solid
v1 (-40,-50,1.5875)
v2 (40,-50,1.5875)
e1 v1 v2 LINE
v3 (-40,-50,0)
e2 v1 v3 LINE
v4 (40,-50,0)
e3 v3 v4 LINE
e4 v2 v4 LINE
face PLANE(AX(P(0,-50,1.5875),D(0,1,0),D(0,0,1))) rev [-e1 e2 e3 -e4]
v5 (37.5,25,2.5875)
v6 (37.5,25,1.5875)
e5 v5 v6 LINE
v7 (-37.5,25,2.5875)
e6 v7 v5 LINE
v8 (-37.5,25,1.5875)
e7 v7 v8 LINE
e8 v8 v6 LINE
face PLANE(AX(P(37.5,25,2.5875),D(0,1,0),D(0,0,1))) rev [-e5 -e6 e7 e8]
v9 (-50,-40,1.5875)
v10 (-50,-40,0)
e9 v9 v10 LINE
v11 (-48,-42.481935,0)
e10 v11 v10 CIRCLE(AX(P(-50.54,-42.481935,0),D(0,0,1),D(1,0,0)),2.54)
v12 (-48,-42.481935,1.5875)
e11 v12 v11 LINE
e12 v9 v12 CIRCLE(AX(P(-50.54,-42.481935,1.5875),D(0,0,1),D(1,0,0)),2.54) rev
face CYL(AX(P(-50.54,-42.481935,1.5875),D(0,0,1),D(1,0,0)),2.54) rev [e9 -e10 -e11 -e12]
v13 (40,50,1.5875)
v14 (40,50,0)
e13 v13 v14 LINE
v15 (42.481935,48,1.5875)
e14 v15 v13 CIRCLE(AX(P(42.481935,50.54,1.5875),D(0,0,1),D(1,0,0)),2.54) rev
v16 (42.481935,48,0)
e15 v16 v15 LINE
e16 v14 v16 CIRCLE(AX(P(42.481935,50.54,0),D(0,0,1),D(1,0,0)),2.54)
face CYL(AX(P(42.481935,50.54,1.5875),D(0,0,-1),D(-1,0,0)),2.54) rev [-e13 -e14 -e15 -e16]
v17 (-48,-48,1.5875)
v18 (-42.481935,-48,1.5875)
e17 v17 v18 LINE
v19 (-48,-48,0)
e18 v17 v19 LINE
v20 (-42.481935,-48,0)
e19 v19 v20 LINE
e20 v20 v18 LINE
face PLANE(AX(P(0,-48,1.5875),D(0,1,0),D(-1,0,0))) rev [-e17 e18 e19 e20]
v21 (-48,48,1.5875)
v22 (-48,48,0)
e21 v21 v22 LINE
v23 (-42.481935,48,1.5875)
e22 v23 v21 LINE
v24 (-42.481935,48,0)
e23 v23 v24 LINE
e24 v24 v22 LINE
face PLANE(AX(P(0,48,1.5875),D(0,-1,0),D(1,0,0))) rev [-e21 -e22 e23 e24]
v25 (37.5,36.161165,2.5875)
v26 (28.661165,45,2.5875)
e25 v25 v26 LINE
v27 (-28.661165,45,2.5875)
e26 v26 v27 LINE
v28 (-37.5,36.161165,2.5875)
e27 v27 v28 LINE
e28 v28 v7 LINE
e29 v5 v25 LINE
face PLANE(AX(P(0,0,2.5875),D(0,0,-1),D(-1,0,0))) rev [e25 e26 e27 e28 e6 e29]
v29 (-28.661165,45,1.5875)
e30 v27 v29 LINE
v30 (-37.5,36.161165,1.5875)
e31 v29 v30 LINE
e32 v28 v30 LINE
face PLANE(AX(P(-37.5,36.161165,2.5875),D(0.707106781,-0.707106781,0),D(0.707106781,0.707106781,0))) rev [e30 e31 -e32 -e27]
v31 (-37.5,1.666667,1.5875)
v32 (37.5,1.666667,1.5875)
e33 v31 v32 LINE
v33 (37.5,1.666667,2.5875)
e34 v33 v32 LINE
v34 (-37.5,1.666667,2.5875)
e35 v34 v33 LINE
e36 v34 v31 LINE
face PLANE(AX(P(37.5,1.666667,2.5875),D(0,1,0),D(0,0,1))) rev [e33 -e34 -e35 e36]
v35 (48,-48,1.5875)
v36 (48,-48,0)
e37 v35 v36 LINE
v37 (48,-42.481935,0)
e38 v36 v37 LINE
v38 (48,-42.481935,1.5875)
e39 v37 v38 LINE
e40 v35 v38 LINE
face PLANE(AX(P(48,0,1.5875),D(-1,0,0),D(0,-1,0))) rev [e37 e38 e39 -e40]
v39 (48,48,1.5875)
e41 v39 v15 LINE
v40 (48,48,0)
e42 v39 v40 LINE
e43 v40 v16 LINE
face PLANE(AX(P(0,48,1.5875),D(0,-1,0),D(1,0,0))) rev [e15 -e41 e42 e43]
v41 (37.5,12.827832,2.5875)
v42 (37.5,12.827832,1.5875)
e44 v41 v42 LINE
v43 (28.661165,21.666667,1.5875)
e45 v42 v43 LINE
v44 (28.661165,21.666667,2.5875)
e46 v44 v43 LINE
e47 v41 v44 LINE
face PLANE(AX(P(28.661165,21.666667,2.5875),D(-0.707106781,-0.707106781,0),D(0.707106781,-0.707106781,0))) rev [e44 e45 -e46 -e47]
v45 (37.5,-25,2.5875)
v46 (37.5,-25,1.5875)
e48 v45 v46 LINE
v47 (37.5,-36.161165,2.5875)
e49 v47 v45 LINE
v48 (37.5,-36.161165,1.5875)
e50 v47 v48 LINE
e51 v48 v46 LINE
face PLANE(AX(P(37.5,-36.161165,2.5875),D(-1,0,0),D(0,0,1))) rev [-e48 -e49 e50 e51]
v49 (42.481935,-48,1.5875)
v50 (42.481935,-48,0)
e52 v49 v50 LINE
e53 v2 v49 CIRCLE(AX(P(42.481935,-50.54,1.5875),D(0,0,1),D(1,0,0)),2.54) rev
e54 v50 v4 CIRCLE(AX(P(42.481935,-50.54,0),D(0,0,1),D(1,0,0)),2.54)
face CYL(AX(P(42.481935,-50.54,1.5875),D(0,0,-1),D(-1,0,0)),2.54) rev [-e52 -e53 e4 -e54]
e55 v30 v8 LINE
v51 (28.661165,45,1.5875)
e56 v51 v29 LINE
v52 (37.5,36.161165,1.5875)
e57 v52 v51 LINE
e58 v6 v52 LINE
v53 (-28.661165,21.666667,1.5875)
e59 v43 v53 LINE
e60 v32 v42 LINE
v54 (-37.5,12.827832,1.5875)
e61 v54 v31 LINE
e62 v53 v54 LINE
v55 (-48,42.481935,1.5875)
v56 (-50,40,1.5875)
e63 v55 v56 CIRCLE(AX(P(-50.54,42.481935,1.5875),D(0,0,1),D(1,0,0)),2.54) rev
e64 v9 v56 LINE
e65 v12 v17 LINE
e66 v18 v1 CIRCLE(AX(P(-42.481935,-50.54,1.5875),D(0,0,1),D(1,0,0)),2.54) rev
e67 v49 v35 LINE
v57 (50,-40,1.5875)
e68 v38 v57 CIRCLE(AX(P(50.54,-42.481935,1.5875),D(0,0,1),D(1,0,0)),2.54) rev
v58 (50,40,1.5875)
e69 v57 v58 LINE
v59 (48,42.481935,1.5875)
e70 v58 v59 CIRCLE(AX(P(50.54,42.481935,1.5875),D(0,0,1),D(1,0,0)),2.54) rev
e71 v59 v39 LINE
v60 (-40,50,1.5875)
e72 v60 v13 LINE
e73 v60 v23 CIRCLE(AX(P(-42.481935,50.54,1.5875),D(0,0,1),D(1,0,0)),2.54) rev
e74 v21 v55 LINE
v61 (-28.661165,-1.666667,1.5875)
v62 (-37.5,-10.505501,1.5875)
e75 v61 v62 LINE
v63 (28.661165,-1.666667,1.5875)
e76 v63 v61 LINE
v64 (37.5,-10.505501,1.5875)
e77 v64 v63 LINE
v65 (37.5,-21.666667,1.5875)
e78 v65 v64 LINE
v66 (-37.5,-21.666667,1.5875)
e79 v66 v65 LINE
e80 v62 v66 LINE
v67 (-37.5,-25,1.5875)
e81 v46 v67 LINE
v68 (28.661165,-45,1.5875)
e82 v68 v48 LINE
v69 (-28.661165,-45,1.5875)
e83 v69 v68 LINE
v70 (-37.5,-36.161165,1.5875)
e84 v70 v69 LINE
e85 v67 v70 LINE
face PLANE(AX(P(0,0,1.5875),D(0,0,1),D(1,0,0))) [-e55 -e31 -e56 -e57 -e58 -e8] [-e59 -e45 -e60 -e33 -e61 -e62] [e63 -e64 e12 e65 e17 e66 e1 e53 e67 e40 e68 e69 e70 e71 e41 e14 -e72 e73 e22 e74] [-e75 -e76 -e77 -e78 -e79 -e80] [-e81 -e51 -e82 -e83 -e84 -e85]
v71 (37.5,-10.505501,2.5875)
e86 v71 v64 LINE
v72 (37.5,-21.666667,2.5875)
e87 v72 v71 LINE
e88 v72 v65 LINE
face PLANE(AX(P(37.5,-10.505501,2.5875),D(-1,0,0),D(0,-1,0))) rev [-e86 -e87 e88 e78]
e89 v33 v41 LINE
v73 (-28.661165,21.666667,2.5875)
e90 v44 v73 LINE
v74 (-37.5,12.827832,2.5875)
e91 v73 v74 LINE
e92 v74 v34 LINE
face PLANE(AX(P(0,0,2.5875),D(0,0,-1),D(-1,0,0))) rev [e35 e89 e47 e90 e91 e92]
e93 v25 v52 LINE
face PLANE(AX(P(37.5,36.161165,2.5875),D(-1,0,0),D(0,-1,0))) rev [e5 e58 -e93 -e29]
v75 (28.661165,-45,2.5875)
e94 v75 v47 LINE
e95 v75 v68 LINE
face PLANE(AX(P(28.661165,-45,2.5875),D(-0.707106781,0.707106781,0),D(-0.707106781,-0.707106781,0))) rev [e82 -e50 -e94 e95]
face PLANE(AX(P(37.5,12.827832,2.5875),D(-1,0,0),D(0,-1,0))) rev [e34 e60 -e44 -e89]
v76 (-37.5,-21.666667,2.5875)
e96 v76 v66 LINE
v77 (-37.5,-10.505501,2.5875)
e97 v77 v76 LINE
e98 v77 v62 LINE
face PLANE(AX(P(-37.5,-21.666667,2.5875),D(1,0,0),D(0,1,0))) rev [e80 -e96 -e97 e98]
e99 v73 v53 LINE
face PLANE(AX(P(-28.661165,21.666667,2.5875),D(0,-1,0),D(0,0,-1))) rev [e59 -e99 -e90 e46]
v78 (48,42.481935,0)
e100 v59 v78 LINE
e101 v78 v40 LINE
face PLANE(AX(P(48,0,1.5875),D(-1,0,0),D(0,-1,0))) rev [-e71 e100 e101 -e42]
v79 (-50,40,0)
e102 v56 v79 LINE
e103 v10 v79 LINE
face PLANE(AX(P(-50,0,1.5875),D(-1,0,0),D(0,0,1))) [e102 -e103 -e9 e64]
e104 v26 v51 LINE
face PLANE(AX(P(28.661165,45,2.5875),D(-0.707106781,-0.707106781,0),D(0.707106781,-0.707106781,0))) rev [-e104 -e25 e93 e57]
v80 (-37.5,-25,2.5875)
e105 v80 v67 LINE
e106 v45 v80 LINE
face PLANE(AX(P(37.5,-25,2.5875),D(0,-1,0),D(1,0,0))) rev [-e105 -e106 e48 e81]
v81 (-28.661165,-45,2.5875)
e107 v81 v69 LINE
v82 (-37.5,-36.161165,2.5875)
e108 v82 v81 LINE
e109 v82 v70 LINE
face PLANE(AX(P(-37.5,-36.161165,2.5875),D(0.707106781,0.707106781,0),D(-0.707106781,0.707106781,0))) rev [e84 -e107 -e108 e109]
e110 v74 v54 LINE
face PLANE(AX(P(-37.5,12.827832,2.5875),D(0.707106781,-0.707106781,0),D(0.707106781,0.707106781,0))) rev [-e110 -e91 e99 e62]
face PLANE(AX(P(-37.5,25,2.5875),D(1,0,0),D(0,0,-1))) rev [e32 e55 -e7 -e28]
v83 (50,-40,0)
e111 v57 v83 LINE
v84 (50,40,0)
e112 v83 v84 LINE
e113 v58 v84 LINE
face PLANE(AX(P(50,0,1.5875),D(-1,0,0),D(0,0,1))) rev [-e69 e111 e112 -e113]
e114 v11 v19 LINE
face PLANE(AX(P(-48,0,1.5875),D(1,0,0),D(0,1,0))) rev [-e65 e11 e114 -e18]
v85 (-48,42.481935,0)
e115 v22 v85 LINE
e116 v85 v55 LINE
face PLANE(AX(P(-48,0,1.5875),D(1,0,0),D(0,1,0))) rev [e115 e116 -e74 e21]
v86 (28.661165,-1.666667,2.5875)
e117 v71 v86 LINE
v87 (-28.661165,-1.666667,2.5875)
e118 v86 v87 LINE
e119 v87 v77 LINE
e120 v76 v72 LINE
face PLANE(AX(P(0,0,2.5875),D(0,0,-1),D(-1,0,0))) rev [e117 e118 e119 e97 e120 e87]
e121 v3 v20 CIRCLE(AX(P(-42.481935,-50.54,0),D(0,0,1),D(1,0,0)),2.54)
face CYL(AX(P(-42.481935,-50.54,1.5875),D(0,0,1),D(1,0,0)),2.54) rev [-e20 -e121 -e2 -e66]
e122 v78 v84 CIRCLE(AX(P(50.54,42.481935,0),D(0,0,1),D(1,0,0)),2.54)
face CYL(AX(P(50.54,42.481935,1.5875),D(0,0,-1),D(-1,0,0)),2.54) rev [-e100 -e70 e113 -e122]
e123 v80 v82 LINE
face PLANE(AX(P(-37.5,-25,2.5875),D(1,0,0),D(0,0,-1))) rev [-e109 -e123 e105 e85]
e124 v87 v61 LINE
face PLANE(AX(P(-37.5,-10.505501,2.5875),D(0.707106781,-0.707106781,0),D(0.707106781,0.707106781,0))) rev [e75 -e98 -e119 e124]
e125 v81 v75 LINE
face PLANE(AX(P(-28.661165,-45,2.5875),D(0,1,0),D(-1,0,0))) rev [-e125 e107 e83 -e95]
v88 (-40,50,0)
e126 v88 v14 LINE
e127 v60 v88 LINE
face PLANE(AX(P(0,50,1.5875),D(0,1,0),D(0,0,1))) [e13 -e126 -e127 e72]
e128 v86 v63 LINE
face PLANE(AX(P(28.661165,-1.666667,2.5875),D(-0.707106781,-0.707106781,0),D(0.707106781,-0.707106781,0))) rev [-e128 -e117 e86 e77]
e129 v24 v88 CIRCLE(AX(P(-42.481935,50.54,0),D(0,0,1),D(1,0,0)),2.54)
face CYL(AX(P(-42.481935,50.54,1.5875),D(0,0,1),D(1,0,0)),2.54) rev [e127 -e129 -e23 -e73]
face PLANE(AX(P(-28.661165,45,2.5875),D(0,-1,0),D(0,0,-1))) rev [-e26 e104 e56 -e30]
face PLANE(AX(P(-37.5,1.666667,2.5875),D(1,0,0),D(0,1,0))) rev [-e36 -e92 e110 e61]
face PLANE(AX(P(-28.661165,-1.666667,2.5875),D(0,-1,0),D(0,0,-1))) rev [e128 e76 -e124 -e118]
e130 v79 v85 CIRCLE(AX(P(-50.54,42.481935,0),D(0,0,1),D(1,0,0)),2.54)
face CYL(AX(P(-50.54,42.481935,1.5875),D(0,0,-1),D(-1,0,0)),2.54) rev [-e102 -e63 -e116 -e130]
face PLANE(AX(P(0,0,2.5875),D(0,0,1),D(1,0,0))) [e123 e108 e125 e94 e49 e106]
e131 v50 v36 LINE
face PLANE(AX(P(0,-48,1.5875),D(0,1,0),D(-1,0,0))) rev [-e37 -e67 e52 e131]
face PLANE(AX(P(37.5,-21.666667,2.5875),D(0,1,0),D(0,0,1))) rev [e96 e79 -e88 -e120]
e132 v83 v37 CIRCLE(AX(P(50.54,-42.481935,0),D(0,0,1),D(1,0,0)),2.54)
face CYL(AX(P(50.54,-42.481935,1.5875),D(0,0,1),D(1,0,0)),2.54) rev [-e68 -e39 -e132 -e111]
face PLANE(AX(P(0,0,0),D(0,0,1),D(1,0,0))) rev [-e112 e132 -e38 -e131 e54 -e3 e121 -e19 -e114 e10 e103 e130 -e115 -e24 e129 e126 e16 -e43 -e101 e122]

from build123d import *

# Parameters (mm, degrees)
BOSS_EXTRUDE1_DEPTH = 1.5875
BOSS_EXTRUDE2_DEPTH = 1
FILLET1_R           = 2.54


with BuildPart() as part:
    # Sketch1 → Boss-Extrude1 (new body)
    with BuildSketch(Plane.XY):
        Polygon((40, 50), (-40, 50), (-40, 48), (-48, 48), (-48, 40), (-50, 40), (-50, -37.864895224), (-50, -40), (-48, -40), (-48, -48), (-40, -48), (-40, -50), (-37.864895224, -50), (40, -50), (40, -48), (48, -48), (48, -40), (50, -40), (50, 40), (48, 40), (48, 48), (40, 48), align=None)
    extrude(amount=BOSS_EXTRUDE1_DEPTH)

    # Sketch2 → Boss-Extrude2 (add)
    with BuildSketch(Plane.XY.offset(1.5875)):
        Polygon((-28.661165235, 45), (28.661165235, 45), (37.5, 36.161165235), (37.5, 25), (-37.5, 25), (-37.5, 36.161165235), align=None)
        Polygon((-28.661165235, 21.666666667), (28.661165235, 21.666666667), (37.5, 12.827831902), (37.5, 1.666666667), (-37.5, 1.666666667), (-37.5, 12.827831902), align=None)
        Polygon((-28.661165235, -1.666666667), (28.661165235, -1.666666667), (37.5, -10.505501431), (37.5, -21.666666667), (-37.5, -21.666666667), (-37.5, -10.505501431), align=None)
        Polygon((-37.5, -36.161165235), (-28.661165235, -45), (28.661165235, -45), (37.5, -36.161165235), (37.5, -25), (-37.5, -25), align=None)
    extrude(amount=BOSS_EXTRUDE2_DEPTH)

    # Fillet1
    # the kernel refuses this fillet: 2.54 mm, written as the material it adds along each edge
    with BuildSketch(Plane(origin=(-48, -40, 0), x_dir=(-1.0, -3.6735059438767946e-12, 0), z_dir=(0, 0, 1)), Plane(origin=(40, -48, 0), x_dir=(3.808509063671012e-12, -1.0, 0), z_dir=(0, 0, 1)), Plane(origin=(48, 40, 0), x_dir=(1.0, 3.659295089161617e-12, 0), z_dir=(0, 0, 1)), Plane(origin=(-40, 48, 0), x_dir=(-3.7978509226345916e-12, 1.0, 0), z_dir=(0, 0, 1))) as fillet1_piece_1:
        with BuildLine():
            CenterArc((2.54, 2.481934729), FILLET1_R, 180, 77.725329785)
            Line((0, 2.481934729), (-0.0508, 2.481934729))
            Line((-0.0508, 2.481934729), (-0.0508, 0))
            Line((-0.0508, 0), (0, -0.0508))
            ThreePointArc((0, -0.0508), (1, -0.0508), (1.9892, -0.049638695))
            Line((1.9892, -0.049638695), (2, 0))
        make_face()
    extrude(amount=1.5875)
    with BuildSketch(Plane(origin=(-40, -48, 0), x_dir=(-1, 0, 0), z_dir=(0, 0, 1)), Plane(origin=(48, -40, 0), x_dir=(0, -1, 0), z_dir=(0, 0, 1)), Plane(origin=(-48, 40, 0), x_dir=(0, 1, 0), z_dir=(0, 0, 1))) as fillet1_piece_2:
        with BuildLine():
            CenterArc((2.481934729, 2.54), FILLET1_R, 192.274670215, 77.725329785)
            Line((0, 2), (-0.049638695, 1.9892))
            ThreePointArc((-0.049638695, 1.9892), (-0.0508, 1), (-0.0508, 0))
            Line((-0.0508, 0), (0, -0.0508))
            Line((0, -0.0508), (2.481934729, -0.0508))
            Line((2.481934729, -0.0508), (2.481934729, 0))
        make_face()
    extrude(amount=1.5875)
    with BuildSketch(Plane(origin=(40, 48, 0), x_dir=(3.726796649058746e-12, 1.0, 0), z_dir=(0, 0, 1))) as fillet1_piece_3:
        with BuildLine():
            CenterArc((2.54, -2.481934729), FILLET1_R, 102.274670215, 77.725329785)
            Line((0, -2.481934729), (-0.0508, -2.481934729))
            Line((-0.0508, -2.481934729), (-0.0508, 0))
            Line((-0.0508, 0), (0, 0.0508))
            ThreePointArc((0, 0.0508), (1, 0.0508), (1.9892, 0.049638695))
            Line((1.9892, 0.049638695), (2, 0))
        make_face()
    extrude(amount=1.5875)


solid = part.part
